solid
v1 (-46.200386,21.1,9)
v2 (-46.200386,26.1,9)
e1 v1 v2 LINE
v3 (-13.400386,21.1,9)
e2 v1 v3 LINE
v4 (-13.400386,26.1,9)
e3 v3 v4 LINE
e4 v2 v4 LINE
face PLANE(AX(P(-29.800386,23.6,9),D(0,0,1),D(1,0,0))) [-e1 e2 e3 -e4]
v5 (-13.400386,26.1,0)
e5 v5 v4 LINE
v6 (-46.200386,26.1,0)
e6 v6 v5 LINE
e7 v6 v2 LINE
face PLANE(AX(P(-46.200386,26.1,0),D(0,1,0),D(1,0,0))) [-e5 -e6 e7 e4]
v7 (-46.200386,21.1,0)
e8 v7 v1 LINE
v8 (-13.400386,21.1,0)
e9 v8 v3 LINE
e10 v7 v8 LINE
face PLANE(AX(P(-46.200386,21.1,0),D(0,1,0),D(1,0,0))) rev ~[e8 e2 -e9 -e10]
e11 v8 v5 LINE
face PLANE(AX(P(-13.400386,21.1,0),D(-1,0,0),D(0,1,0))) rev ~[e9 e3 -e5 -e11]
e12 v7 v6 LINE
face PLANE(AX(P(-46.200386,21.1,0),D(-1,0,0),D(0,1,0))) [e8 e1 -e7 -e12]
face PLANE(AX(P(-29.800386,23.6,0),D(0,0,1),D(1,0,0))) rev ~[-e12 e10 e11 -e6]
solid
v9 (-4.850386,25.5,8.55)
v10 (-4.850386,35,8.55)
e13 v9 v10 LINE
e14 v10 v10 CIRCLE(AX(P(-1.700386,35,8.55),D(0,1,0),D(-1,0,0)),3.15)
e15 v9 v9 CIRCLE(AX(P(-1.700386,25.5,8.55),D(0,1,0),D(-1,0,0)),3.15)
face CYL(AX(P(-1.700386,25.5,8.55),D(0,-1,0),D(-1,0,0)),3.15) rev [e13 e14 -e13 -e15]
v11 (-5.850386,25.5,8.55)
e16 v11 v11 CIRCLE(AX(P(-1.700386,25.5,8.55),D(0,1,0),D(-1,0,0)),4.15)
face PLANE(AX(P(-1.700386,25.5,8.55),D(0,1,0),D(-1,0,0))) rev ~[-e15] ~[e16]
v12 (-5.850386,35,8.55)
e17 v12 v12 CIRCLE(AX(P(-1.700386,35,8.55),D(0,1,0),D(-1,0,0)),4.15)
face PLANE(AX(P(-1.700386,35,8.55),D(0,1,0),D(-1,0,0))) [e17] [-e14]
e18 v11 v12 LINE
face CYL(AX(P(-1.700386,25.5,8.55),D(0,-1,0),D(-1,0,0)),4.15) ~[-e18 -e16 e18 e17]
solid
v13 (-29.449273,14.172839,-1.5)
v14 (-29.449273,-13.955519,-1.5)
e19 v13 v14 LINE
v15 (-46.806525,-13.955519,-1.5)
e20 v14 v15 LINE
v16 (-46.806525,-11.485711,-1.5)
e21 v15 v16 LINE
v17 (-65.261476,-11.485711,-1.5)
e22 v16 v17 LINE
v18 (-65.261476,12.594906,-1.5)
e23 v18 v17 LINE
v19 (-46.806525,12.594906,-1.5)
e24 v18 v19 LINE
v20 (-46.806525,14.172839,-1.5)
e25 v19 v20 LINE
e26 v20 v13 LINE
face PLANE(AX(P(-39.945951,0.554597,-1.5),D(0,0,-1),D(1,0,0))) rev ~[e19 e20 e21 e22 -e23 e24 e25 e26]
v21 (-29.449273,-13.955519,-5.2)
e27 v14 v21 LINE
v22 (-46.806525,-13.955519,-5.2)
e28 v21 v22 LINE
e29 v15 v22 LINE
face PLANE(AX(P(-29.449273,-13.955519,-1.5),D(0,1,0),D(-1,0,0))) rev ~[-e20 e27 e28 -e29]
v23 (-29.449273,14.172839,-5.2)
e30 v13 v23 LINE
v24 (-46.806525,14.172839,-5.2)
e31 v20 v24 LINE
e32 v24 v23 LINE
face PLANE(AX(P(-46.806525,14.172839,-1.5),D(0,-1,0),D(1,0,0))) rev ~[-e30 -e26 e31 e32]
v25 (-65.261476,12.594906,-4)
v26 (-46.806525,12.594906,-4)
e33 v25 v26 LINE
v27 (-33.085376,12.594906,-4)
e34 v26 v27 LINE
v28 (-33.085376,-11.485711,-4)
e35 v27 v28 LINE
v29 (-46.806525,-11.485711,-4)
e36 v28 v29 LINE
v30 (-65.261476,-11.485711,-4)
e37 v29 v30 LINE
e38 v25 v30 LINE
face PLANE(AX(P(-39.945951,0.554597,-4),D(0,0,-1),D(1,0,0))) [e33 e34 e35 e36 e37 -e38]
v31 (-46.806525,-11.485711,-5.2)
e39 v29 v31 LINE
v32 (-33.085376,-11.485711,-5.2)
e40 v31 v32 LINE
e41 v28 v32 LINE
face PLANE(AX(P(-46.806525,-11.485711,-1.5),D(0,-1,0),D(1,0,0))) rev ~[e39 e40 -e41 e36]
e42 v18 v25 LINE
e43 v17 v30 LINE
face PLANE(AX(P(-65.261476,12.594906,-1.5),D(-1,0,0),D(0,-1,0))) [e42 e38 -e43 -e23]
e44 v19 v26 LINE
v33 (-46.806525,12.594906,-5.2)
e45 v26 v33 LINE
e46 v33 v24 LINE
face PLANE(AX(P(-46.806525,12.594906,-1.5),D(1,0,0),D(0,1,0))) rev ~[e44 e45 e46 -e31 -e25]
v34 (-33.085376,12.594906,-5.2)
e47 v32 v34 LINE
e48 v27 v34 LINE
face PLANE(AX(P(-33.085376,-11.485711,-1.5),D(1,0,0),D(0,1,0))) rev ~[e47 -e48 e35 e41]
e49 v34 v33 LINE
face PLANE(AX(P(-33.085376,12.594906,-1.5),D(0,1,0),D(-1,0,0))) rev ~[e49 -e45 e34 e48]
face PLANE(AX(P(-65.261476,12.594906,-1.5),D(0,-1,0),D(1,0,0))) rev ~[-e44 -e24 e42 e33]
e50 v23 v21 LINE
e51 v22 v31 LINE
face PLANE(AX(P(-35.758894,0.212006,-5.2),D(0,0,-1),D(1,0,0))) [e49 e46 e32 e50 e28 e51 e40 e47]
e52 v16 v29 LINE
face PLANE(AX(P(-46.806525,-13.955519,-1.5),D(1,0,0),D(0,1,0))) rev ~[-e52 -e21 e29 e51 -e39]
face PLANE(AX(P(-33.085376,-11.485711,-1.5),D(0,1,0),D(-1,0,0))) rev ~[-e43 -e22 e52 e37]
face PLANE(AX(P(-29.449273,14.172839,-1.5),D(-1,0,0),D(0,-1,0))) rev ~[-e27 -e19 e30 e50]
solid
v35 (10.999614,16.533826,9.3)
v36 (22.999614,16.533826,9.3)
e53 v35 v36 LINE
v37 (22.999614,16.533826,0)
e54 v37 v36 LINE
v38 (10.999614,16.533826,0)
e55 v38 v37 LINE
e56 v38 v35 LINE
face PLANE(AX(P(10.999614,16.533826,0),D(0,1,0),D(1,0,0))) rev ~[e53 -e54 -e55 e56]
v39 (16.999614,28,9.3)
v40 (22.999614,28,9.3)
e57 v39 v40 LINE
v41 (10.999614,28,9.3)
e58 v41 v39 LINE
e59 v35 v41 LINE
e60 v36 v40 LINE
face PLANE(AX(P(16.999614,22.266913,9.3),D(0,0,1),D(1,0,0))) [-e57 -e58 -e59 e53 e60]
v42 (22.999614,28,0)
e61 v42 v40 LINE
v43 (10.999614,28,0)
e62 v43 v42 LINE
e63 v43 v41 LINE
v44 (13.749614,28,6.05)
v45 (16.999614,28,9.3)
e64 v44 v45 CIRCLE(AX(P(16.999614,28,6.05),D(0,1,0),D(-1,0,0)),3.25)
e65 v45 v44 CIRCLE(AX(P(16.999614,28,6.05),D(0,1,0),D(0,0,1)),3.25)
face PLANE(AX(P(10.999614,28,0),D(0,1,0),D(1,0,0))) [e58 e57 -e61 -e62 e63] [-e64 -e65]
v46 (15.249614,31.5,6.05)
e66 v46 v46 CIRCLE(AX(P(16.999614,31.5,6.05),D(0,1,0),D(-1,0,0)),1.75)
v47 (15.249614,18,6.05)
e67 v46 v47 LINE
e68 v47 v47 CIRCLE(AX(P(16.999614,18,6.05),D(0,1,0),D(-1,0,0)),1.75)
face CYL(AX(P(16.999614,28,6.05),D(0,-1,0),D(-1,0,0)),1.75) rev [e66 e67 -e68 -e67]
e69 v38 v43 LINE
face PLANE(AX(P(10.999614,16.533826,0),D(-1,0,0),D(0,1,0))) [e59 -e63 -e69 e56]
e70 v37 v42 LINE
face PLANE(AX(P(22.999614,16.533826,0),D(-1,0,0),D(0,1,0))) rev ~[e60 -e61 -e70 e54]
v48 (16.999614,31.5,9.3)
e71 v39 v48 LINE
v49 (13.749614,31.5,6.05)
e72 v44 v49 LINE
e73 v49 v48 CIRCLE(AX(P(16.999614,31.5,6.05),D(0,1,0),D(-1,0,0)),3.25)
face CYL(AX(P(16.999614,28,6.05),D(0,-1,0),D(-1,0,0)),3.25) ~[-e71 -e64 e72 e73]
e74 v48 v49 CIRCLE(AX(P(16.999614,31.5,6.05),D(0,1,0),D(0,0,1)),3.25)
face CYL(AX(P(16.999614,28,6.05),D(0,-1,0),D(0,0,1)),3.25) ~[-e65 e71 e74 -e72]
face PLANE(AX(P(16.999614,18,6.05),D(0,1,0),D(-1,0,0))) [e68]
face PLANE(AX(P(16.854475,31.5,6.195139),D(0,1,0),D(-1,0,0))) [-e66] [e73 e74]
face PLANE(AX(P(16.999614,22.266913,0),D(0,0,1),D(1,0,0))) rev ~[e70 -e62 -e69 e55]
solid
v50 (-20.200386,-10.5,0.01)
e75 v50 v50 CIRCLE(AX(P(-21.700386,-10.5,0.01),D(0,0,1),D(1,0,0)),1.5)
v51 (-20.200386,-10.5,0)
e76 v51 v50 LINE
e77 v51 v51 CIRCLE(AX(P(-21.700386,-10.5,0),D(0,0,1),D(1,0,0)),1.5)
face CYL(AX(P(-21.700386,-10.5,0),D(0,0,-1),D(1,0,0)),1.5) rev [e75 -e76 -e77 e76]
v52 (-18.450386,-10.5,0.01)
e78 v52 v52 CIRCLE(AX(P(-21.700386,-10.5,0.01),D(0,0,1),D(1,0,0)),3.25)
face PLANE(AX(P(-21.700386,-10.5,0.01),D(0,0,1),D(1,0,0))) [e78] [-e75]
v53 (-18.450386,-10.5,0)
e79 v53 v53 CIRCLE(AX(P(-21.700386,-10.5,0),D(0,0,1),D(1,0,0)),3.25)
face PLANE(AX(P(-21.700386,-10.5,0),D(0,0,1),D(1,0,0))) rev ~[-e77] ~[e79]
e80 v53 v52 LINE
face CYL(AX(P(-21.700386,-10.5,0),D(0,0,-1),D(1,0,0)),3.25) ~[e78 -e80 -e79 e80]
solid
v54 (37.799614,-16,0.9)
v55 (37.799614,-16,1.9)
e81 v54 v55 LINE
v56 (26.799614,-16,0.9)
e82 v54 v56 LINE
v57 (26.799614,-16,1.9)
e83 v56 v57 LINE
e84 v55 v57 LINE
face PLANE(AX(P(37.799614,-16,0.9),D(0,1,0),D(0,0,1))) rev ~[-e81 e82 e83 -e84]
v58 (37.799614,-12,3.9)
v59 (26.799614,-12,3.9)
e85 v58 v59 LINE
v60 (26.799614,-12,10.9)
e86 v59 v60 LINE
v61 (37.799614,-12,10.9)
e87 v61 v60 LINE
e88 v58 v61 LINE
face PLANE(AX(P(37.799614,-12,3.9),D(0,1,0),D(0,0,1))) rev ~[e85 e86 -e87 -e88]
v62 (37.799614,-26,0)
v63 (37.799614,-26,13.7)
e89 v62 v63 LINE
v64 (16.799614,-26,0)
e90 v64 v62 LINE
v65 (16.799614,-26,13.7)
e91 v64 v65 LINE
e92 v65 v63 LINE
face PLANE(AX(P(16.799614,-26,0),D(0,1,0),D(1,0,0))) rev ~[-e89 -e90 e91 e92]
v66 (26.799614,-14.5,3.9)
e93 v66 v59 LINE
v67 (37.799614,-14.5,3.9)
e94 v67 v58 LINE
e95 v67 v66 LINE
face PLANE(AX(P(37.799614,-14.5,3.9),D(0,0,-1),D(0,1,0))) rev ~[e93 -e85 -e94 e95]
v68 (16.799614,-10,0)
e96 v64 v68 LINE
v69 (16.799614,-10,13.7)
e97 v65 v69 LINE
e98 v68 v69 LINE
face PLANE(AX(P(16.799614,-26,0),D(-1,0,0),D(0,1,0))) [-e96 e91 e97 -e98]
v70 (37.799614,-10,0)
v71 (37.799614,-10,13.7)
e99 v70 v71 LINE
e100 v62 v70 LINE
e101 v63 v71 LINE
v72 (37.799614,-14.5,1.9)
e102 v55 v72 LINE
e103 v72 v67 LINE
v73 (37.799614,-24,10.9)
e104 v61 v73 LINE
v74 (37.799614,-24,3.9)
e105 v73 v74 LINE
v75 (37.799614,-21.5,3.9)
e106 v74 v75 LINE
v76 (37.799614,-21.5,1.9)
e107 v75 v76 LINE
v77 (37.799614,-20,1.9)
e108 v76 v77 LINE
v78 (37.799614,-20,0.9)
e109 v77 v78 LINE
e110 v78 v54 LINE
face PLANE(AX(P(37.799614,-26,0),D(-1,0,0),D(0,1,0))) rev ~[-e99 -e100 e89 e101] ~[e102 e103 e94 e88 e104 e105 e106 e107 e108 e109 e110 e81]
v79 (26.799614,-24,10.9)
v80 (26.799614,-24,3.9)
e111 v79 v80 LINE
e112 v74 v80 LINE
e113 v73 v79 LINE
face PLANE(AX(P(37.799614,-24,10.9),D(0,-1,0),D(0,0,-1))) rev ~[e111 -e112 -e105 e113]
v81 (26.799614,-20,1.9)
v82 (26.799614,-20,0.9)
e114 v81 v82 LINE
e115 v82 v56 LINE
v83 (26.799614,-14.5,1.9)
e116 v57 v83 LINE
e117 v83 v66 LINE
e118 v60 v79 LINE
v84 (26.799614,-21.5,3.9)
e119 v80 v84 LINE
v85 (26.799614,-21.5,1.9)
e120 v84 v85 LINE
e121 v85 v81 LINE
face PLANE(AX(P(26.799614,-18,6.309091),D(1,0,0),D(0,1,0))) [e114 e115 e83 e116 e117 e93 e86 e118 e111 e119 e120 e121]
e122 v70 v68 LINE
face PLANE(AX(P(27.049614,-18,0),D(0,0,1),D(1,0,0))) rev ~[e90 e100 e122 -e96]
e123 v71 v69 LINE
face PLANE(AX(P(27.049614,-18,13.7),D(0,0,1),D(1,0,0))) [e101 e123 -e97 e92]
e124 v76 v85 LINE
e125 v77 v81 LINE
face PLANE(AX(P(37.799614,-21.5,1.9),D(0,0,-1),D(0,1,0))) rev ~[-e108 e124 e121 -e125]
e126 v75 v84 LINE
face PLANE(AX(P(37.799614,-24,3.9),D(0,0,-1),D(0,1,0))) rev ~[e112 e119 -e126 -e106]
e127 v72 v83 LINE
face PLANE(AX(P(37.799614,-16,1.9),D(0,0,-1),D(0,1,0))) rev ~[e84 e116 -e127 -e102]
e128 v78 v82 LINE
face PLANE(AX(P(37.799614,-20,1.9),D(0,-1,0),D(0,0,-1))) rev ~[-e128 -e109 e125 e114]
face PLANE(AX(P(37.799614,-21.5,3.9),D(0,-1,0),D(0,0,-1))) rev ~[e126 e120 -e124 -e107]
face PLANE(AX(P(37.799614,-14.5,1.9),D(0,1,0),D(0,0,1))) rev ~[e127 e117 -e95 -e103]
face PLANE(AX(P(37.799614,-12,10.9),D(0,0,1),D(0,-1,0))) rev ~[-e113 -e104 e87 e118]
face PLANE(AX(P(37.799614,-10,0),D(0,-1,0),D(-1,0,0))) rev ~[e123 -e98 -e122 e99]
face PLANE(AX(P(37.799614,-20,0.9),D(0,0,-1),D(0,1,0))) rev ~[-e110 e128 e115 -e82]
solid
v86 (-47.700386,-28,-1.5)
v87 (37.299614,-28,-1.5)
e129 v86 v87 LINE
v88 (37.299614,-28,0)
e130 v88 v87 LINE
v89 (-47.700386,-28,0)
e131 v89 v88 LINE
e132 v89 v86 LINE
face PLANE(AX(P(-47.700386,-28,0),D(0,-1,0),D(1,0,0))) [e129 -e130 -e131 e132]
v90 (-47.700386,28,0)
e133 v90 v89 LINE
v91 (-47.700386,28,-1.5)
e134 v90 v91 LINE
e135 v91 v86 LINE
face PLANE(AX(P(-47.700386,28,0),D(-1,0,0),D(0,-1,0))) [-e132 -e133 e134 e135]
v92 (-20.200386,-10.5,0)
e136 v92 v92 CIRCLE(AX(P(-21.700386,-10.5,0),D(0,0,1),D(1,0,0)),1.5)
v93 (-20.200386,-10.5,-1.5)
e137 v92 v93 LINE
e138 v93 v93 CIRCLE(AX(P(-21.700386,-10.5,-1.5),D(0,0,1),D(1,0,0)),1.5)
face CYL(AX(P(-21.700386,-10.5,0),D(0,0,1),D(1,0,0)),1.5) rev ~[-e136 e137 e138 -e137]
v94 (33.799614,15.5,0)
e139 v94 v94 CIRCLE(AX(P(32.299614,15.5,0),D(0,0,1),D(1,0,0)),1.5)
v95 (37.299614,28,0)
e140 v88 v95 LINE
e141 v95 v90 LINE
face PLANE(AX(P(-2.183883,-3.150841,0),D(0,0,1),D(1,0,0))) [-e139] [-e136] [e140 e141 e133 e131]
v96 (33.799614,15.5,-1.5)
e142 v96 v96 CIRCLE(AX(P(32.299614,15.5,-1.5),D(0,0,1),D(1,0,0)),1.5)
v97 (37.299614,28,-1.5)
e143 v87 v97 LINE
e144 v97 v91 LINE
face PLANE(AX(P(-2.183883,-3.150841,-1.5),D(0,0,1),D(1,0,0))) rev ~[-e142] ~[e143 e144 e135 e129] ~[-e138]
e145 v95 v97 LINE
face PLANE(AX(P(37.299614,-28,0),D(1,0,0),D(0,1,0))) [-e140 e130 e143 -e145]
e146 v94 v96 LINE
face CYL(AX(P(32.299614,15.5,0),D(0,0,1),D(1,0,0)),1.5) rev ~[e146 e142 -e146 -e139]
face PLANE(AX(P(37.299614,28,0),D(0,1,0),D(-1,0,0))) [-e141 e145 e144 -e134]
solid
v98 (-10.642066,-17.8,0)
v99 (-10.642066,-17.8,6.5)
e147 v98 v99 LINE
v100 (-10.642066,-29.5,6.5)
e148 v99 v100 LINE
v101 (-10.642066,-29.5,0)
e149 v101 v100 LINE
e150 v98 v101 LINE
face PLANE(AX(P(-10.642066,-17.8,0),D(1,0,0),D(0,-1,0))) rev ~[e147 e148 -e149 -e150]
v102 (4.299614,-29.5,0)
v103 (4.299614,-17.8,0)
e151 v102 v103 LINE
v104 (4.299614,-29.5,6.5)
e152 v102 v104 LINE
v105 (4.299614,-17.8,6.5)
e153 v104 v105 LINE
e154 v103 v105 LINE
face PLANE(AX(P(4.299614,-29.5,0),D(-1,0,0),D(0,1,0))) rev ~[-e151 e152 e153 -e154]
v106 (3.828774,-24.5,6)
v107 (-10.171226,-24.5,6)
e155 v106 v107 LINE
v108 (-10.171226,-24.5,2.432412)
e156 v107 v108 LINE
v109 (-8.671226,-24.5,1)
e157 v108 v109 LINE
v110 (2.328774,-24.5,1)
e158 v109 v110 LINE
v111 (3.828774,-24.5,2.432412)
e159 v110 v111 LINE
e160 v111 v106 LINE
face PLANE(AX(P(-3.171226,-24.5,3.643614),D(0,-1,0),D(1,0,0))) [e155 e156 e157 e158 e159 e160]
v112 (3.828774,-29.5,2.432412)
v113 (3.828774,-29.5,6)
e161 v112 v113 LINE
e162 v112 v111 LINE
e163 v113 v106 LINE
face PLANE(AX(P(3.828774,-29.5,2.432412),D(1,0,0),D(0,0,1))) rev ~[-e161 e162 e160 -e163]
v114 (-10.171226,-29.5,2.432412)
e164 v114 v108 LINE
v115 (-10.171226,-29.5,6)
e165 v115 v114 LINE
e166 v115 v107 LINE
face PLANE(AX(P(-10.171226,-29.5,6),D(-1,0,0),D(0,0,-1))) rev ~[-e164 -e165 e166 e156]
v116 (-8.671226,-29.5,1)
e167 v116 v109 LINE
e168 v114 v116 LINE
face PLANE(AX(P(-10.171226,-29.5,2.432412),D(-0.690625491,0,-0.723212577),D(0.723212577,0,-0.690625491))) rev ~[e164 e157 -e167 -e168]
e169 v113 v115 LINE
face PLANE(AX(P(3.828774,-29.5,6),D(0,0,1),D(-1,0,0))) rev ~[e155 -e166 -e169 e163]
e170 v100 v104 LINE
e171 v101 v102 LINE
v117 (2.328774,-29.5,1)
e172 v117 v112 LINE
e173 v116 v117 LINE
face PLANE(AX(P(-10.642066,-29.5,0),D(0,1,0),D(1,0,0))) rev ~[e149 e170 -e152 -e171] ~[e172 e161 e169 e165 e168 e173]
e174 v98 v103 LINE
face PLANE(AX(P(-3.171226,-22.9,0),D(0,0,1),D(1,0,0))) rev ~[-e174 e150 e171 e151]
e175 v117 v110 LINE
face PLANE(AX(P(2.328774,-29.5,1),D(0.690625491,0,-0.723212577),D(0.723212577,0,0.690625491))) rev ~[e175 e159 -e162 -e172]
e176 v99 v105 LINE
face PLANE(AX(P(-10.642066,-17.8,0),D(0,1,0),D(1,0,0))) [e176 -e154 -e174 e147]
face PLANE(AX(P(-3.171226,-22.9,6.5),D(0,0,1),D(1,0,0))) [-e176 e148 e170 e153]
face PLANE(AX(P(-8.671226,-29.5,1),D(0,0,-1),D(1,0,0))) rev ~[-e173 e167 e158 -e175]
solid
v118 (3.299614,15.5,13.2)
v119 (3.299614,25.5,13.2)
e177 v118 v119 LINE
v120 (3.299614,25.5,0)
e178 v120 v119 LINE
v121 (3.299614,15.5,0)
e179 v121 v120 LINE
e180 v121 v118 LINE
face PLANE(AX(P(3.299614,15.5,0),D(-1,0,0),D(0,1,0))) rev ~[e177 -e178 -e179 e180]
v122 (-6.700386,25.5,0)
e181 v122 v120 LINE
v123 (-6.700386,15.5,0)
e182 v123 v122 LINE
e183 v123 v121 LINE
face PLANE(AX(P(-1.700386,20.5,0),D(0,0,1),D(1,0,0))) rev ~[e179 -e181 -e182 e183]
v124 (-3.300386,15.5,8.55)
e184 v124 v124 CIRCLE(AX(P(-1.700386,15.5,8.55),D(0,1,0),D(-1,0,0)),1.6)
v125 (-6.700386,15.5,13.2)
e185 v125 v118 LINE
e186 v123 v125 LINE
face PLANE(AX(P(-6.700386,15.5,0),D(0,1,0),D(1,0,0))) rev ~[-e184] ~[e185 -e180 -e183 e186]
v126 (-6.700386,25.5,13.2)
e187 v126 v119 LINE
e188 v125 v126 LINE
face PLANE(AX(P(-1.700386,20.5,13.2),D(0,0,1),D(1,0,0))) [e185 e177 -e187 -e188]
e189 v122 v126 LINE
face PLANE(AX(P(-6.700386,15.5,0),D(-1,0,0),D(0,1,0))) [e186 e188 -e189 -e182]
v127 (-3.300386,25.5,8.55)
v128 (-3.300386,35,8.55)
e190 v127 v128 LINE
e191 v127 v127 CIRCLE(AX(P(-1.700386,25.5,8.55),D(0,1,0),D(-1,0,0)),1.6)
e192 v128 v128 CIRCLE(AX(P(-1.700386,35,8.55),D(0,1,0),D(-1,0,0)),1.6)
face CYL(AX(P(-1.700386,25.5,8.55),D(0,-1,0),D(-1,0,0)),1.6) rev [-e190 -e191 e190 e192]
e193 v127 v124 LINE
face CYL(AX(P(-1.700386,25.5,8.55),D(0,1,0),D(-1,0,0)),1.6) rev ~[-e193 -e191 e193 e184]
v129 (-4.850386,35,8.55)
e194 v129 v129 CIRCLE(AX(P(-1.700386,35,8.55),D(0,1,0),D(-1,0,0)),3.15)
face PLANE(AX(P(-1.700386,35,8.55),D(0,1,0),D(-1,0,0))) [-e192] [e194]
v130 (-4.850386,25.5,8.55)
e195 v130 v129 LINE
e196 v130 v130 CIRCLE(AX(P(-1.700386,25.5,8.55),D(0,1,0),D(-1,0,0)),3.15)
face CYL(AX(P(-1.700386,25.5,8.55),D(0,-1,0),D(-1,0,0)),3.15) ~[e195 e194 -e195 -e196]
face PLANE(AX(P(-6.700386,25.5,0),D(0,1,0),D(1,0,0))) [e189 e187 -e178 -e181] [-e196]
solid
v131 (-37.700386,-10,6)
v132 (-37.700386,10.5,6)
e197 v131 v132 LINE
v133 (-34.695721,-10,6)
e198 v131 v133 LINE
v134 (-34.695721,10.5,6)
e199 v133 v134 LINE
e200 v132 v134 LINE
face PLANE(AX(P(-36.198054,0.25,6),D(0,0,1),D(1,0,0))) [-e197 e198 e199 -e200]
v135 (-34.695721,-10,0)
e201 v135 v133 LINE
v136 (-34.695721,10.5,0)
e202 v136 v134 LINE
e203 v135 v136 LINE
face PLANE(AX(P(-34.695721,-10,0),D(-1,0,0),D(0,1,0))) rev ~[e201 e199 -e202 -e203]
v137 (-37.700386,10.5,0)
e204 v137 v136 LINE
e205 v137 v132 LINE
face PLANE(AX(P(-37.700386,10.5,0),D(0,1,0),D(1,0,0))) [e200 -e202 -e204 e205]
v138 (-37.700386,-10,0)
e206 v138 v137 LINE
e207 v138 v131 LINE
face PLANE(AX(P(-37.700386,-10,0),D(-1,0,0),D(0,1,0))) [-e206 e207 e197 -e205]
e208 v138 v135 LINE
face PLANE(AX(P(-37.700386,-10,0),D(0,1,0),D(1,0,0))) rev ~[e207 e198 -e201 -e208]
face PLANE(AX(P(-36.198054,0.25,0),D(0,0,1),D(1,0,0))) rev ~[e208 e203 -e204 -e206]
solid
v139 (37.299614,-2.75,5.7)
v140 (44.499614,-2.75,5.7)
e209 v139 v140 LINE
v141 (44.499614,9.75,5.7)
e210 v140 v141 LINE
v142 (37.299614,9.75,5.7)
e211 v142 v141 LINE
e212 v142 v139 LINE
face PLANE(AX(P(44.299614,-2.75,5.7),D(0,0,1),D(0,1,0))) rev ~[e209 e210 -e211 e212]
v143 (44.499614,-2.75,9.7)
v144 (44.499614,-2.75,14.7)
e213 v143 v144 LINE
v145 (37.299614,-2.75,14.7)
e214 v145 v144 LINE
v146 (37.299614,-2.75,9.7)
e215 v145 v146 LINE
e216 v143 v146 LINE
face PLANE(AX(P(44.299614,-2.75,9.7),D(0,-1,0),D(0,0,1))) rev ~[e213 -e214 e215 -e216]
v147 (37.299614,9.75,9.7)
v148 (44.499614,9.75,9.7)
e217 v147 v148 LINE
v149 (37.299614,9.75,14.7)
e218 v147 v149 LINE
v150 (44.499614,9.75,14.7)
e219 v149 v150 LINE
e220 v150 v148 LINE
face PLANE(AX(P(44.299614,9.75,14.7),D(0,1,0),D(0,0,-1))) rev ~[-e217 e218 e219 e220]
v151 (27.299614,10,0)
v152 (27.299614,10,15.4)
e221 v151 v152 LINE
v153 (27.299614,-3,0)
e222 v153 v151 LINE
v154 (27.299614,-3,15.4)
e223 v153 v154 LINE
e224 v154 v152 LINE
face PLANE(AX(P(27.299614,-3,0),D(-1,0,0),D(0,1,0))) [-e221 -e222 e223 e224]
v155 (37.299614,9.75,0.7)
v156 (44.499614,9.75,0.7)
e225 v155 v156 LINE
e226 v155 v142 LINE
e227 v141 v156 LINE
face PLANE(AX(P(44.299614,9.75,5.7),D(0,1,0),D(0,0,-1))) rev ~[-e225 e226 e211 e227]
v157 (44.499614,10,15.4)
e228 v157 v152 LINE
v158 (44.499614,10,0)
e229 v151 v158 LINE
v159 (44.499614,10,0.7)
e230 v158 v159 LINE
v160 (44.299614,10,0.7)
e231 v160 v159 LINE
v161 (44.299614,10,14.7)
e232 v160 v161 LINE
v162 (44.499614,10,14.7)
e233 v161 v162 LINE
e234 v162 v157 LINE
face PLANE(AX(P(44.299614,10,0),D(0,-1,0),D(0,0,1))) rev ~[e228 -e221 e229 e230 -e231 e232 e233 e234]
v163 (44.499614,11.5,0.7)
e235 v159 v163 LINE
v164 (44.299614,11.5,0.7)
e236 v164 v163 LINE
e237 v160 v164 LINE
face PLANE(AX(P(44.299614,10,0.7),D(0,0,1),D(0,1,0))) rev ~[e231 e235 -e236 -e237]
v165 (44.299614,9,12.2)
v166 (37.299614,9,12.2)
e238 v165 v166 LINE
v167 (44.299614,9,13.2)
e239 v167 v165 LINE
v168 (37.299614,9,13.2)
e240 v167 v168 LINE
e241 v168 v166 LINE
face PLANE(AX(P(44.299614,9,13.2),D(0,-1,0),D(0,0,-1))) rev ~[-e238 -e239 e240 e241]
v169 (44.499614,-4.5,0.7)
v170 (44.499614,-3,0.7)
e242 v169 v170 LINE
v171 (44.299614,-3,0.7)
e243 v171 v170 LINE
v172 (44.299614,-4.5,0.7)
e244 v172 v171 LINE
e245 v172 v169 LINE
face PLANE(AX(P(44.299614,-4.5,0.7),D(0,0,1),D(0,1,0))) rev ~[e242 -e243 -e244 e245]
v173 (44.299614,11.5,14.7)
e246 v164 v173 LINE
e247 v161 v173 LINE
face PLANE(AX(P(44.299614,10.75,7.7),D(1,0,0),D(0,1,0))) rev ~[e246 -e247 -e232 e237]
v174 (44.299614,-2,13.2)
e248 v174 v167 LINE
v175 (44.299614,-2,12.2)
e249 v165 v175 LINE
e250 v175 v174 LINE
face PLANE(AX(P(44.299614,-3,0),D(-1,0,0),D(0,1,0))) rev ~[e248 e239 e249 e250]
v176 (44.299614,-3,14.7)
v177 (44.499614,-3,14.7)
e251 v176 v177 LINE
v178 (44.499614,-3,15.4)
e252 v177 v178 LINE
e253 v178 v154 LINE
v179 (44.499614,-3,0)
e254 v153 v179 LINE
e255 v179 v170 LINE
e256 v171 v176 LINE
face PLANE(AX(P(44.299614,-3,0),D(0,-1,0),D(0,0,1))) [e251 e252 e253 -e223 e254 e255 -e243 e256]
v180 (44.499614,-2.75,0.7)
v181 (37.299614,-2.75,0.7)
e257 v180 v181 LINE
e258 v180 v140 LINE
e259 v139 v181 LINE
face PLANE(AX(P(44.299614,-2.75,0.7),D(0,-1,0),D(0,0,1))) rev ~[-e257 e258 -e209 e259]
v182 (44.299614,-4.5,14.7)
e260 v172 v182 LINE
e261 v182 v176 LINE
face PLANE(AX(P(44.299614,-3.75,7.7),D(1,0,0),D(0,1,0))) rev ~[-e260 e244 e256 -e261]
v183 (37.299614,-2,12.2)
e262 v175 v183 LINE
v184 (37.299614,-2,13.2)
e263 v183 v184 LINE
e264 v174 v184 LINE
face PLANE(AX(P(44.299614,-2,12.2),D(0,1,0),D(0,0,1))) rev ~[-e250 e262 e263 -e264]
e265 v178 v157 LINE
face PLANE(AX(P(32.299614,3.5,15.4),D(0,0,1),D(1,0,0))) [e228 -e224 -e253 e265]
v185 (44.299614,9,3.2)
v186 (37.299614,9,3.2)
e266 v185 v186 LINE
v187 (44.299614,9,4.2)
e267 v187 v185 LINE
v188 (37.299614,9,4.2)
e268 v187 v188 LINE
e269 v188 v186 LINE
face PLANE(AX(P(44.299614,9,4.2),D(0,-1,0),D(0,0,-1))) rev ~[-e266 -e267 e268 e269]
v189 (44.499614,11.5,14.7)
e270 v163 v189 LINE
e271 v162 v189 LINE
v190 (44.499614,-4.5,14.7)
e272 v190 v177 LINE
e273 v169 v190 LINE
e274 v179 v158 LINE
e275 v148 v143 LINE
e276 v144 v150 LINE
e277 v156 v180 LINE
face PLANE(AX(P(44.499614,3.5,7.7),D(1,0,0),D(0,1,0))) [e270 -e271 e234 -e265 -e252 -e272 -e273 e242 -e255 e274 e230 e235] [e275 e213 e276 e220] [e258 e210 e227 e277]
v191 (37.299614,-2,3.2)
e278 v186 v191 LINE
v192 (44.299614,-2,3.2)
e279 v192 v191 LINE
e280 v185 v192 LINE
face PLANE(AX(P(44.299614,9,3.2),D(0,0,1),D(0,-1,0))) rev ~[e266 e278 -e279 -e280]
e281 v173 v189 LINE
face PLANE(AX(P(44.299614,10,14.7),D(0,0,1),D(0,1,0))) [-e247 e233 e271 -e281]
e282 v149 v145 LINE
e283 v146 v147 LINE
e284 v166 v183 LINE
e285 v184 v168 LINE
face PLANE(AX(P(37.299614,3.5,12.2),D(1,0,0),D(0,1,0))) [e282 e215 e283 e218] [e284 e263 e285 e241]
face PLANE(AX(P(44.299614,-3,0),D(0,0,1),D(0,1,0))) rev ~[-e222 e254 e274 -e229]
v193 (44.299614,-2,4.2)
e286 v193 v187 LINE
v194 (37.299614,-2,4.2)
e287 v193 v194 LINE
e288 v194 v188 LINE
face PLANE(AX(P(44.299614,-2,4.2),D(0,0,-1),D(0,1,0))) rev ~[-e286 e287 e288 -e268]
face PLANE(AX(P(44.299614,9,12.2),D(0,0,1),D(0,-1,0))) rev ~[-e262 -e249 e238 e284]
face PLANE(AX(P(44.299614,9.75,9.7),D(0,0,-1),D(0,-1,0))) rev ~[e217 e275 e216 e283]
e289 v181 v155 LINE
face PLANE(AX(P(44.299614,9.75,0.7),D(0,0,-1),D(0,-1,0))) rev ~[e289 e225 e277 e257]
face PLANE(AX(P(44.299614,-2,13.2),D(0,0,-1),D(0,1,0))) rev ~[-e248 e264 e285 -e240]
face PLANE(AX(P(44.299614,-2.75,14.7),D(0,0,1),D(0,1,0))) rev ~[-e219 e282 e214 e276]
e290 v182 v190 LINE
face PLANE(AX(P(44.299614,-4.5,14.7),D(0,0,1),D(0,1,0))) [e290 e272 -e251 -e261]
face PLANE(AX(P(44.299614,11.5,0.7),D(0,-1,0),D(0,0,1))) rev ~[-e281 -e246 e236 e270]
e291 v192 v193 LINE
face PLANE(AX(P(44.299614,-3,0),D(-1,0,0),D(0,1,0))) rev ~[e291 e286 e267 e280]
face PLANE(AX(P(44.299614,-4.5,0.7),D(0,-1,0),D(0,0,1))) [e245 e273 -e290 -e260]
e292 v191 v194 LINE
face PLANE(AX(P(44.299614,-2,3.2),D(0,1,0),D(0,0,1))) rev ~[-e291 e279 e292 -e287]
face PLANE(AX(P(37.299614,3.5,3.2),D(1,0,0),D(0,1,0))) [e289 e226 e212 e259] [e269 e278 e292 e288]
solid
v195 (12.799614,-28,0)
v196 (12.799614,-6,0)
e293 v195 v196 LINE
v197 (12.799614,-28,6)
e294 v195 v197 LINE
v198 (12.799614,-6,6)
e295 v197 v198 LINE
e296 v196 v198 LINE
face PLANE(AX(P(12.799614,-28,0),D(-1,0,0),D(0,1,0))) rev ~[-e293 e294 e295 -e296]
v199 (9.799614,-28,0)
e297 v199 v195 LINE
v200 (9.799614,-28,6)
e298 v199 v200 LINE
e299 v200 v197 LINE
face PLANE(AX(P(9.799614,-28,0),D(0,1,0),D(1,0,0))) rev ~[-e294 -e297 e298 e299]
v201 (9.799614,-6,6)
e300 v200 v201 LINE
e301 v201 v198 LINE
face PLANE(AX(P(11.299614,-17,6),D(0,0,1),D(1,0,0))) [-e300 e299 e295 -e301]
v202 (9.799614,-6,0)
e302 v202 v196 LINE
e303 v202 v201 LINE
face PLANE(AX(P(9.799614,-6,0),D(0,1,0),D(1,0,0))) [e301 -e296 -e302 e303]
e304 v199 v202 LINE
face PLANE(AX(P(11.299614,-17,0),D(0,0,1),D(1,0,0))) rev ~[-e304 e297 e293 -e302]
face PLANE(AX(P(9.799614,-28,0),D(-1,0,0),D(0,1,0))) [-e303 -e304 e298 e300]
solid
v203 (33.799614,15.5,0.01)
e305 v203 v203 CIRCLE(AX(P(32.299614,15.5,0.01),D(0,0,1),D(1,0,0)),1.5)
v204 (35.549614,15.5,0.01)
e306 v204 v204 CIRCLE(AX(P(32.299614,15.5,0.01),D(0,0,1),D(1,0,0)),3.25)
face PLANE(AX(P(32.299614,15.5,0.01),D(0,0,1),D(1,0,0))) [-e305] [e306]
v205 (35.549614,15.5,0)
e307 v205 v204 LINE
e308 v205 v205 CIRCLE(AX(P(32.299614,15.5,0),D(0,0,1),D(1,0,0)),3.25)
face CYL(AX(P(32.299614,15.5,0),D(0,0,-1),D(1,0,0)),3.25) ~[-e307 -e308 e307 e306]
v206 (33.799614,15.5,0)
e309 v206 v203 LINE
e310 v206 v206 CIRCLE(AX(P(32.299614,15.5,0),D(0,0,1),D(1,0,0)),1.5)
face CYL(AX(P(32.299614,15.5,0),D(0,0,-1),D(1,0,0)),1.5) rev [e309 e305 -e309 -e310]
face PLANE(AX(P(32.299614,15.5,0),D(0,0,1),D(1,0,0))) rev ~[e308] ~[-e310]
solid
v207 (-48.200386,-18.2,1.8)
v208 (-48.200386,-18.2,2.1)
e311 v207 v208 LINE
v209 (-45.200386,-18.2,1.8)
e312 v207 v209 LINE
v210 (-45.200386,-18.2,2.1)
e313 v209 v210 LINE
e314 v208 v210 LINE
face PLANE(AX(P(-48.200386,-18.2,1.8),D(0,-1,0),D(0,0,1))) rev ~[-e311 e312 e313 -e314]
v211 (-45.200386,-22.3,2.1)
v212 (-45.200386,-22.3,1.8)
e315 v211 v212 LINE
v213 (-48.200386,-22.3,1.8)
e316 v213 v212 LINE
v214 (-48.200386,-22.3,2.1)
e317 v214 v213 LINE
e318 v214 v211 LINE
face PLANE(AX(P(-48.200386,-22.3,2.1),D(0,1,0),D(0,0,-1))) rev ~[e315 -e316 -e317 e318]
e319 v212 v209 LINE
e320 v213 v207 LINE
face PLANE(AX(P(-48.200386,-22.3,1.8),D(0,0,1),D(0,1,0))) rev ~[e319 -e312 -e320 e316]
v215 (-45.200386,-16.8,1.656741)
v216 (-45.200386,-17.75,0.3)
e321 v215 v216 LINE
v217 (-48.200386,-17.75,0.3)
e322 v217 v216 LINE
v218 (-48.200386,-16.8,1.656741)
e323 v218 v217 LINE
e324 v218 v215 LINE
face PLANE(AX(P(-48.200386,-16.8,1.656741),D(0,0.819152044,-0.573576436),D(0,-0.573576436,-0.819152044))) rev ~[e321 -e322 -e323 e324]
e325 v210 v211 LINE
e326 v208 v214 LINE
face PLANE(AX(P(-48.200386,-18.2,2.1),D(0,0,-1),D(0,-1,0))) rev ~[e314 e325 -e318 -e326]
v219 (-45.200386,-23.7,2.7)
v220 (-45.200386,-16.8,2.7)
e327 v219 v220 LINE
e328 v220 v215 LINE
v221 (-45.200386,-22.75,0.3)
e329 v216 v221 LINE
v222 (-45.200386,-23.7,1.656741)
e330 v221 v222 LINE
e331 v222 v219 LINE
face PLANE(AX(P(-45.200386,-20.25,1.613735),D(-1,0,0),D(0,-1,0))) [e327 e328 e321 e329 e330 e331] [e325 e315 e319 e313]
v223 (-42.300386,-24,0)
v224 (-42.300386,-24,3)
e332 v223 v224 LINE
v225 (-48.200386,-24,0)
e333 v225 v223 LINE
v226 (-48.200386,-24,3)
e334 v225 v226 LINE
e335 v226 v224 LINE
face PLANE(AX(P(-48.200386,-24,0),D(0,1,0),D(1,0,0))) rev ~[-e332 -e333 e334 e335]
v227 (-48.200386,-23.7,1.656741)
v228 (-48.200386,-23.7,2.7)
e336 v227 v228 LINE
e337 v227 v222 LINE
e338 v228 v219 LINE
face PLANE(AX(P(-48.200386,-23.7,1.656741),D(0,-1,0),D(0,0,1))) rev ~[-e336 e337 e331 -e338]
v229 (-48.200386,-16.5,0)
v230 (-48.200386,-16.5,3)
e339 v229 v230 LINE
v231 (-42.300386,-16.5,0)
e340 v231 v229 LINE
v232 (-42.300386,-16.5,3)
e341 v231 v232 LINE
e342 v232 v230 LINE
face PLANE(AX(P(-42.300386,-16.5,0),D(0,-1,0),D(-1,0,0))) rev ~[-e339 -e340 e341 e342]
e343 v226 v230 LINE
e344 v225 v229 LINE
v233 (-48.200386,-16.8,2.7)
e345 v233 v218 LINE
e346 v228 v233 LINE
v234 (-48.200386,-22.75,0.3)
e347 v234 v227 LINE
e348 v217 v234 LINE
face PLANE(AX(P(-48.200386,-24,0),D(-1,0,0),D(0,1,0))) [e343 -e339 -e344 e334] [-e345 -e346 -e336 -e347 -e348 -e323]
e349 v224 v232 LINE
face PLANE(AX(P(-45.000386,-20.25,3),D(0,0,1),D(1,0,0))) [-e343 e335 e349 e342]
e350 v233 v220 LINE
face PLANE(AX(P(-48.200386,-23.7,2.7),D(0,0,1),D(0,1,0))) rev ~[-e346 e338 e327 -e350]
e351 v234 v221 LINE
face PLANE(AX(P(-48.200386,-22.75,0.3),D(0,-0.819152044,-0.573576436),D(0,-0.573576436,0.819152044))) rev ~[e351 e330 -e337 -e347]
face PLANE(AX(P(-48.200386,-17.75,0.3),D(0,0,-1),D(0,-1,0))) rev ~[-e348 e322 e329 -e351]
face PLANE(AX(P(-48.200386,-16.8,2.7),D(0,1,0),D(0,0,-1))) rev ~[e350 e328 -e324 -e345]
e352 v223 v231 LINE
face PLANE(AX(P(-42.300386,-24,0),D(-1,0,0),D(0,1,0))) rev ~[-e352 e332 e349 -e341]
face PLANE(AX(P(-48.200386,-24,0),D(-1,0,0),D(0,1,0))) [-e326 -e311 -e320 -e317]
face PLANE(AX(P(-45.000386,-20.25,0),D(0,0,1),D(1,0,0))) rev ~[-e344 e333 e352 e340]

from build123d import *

# Parameters (mm, degrees)
F0_R      = 3.25
F0_W      = 32.8
F0_H      = 5
F0_W_2    = 10
F0_H_2    = 10
F0_H_3    = 13
F0_R_2    = 1.5
F0_W_3    = 20.5
F0_H_4    = 16
F0_W_4    = 13.5
F0_H_5    = 24
F0_W_5    = 3.0046645552
F0_H_6    = 20.5
F0_W_6    = 1
F0_W_7    = 5.4
F0_H_7    = 7.5
F0_W_8    = 12
F0_H_8    = 11.4661744535
F0_W_9    = 14.9416802451
F0_H_9    = 10.2
F0_W_10   = 3
F0_H_10   = 22
F1_DEPTH  = 1.5
F0_W_11   = 0.5
F2_DEPTH  = 13.7
F0_W_12   = 7
F3_DEPTH  = 15.4
F4_DEPTH  = 9.3
F5_DEPTH  = 13.2
F6_DEPTH  = 9
F7_DEPTH  = 6
F0_H_11   = 1.5
F8_DEPTH  = 6.5
F9_DEPTH  = 0.01
F10_DEPTH = 3
F11_DEPTH = 6
F13_DEPTH = 3.7
F12_W     = 13.7211494148
F12_H     = 24.080616422
F12_W_2   = 0.8938605189
F12_W_3   = 17.5610897839
F14_DEPTH = 2.5
F15_R     = 1.75
F16_DEPTH = 3.5
F17_DEPTH = 10
F18_R     = 1.6
F19_DEPTH = 55.001
F18_R_2   = 3.15
F20_DEPTH = 9.5
F18_R_3   = 4.15
F21_DEPTH = 9.5
F23_DEPTH = 5
F25_DEPTH = 11
F27_DEPTH = 7
F29_DEPTH = 3
F30_W     = 1.5
F30_H     = 14
F26_W     = 13
F26_H     = 15.4
F31_DEPTH = 0.2


with BuildPart() as f1:
    # F0 (on Top) → F1 (new body)
    with BuildSketch(Plane.XY):
        Polygon((10.999614042, 28), (-47.700385958, 28), (-47.700385958, 12.6100301519), (-46.700385958, 12.6100301519), (-46.700385958, 14.1100301519), (-29.700385958, 14.1100301519), (-29.700385958, -13.8899698481), (-46.700385958, -13.8899698481), (-46.700385958, -11.3899698481), (-47.700385958, -11.3899698481), (-47.700385958, -16.5), (-42.300385958, -16.5), (-42.300385958, -24), (-47.700385958, -24), (-47.700385958, -28), (-10.6420662031, -28), (-10.6420662031, -17.8), (4.299614042, -17.8), (4.299614042, -28), (9.799614042, -28), (9.799614042, -6), (12.799614042, -6), (12.799614042, -28), (37.299614042, -28), (37.299614042, -26), (16.799614042, -26), (16.799614042, -10), (37.299614042, -10), (37.299614042, -3), (27.299614042, -3), (27.299614042, 10), (37.299614042, 10), (37.299614042, 28), (22.999614042, 28), (22.999614042, 16.5338255465), (10.999614042, 16.5338255465), align=None)
        with Locations((-21.700385958, -10.5)):
            Circle(F0_R, mode=Mode.SUBTRACT)
        with Locations((-29.800385958, 23.6)):
            Rectangle(F0_W, F0_H, mode=Mode.SUBTRACT)
        with Locations((-1.700385958, 20.5)):
            Rectangle(F0_W_2, F0_H_2, mode=Mode.SUBTRACT)
        with Locations((32.299614042, 15.5)):
            Circle(F0_R, mode=Mode.SUBTRACT)
        with Locations((32.299614042, 3.5)):
            Rectangle(F0_W_2, F0_H_3)
        with Locations((32.299614042, 15.5)):
            Circle(F0_R)
        with Locations((32.299614042, 15.5)):
            Circle(F0_R_2, mode=Mode.SUBTRACT)
        with Locations((-21.700385958, -10.5)):
            Circle(F0_R)
        with Locations((-21.700385958, -10.5)):
            Circle(F0_R_2, mode=Mode.SUBTRACT)
        with Locations((27.049614042, -18)):
            Rectangle(F0_W_3, F0_H_4)
        Polygon((-46.700385958, 14.1100301519), (-46.700385958, 12.6100301519), (-33.200385958, 12.6100301519), (-33.200385958, -11.3899698481), (-46.700385958, -11.3899698481), (-46.700385958, -13.8899698481), (-29.700385958, -13.8899698481), (-29.700385958, 14.1100301519), align=None)
        with Locations((-39.950385958, 0.6100301519)):
            Rectangle(F0_W_4, F0_H_5)
        with Locations((-36.1980536804, 0.25)):
            Rectangle(F0_W_5, F0_H_6, mode=Mode.SUBTRACT)
        with Locations((-47.200385958, 0.6100301519)):
            Rectangle(F0_W_6, F0_H_5)
        with Locations((-45.000385958, -20.25)):
            Rectangle(F0_W_7, F0_H_7)
        with Locations((-29.800385958, 23.6)):
            Rectangle(F0_W, F0_H)
        with Locations((-1.700385958, 20.5)):
            Rectangle(F0_W_2, F0_H_2)
        with Locations((16.999614042, 22.2669127733)):
            Rectangle(F0_W_8, F0_H_8)
        with Locations((-3.1712260805, -22.9)):
            Rectangle(F0_W_9, F0_H_9)
        with Locations((11.299614042, -17)):
            Rectangle(F0_W_10, F0_H_10)
        with Locations((-36.1980536804, 0.25)):
            Rectangle(F0_W_5, F0_H_6)
    extrude(amount=-F1_DEPTH)


with BuildPart() as f2:
    # F0 (on Top) → F2 (new body)
    with BuildSketch(Plane.XY):
        with Locations((27.049614042, -18)):
            Rectangle(F0_W_3, F0_H_4)
        with Locations((37.549614042, -18)):
            Rectangle(F0_W_11, F0_H_4)
    extrude(amount=F2_DEPTH)

    # F24 (on face) → F25 (cut)
    with BuildSketch(Plane.YZ.offset(37.799614042)):
        Polygon((-12, 10.9), (-18, 10.9), (-24, 10.9), (-24, 3.9), (-21.5, 3.9), (-21.5, 1.9), (-20, 1.9), (-20, 0.9), (-18, 0.9), (-16, 0.9), (-16, 1.9), (-14.5, 1.9), (-14.5, 3.9), (-12, 3.9), align=None)
    extrude(amount=-F25_DEPTH, mode=Mode.SUBTRACT)


with BuildPart() as f3:
    # F0 (on Top) → F3 (new body)
    with BuildSketch(Plane.XY):
        with Locations((32.299614042, 3.5)):
            Rectangle(F0_W_2, F0_H_3)
        with Locations((40.799614042, 3.5)):
            Rectangle(F0_W_12, F0_H_3)
    extrude(amount=F3_DEPTH)

    # F26 (on face) → F27 (cut)
    with BuildSketch(Plane.YZ.offset(44.299614042)):
        Polygon((9.75, 14.7), (3.5, 14.7), (-2.75, 14.7), (-2.75, 9.7), (3.5, 9.7), (9.75, 9.7), align=None)
        Polygon((-2, 13.2), (3.5, 13.2), (9, 13.2), (9, 12.2), (3.5, 12.2), (-2, 12.2), align=None, mode=Mode.SUBTRACT)
        Polygon((9.75, 5.7), (3.5, 5.7), (-2.75, 5.7), (-2.75, 0.7), (3.5, 0.7), (9.75, 0.7), align=None)
        Polygon((-2, 4.2), (3.5, 4.2), (9, 4.2), (9, 3.2), (3.5, 3.2), (-2, 3.2), align=None, mode=Mode.SUBTRACT)
    extrude(amount=-F27_DEPTH, mode=Mode.SUBTRACT)

    # F30 (on face) + F26 (on face) → F31 (join)
    with BuildSketch(Plane.YZ.offset(44.299614042)):
        with Locations((-3.75, 7.7)):
            Rectangle(F30_W, F30_H)
        with Locations((10.75, 7.7)):
            Rectangle(F30_W, F30_H)
    with BuildSketch(Plane.YZ.offset(44.299614042)):
        with Locations((3.5, 7.7)):
            Rectangle(F26_W, F26_H)
        Polygon((-2.75, 5.7), (3.5, 5.7), (9.75, 5.7), (9.75, 0.7), (3.5, 0.7), (-2.75, 0.7), align=None, mode=Mode.SUBTRACT)
        Polygon((-2.75, 14.7), (3.5, 14.7), (9.75, 14.7), (9.75, 9.7), (3.5, 9.7), (-2.75, 9.7), align=None, mode=Mode.SUBTRACT)
    extrude(amount=F31_DEPTH)


with BuildPart() as f4:
    # F0 (on Top) → F4 (new body)
    with BuildSketch(Plane.XY):
        with Locations((16.999614042, 22.2669127733)):
            Rectangle(F0_W_8, F0_H_8)
    extrude(amount=F4_DEPTH)

    # F15 (on face) → F16 (join)
    with BuildSketch(Plane(origin=(0, 28, 0), x_dir=(-1, 0, 0), z_dir=(0, 1, 0))):
        with BuildLine():
            ThreePointArc((-16.999614042, 9.3), (-19.2977110809, 3.7519029611), (-13.749614042, 6.05))
            ThreePointArc((-13.749614042, 6.05), (-14.7015170032, 8.3480970389), (-16.999614042, 9.3))
        make_face()
        with Locations((-16.999614042, 6.05)):
            Circle(F15_R, mode=Mode.SUBTRACT)
    extrude(amount=F16_DEPTH)

    # F15 (on face) → F17 (cut)
    with BuildSketch(Plane(origin=(0, 28, 0), x_dir=(-1, 0, 0), z_dir=(0, 1, 0))):
        with Locations((-16.999614042, 6.05)):
            Circle(F15_R)
    extrude(amount=-F17_DEPTH, mode=Mode.SUBTRACT)


with BuildPart() as f5:
    # F0 (on Top) → F5 (new body)
    with BuildSketch(Plane.XY):
        with Locations((-1.700385958, 20.5)):
            Rectangle(F0_W_2, F0_H_2)
    extrude(amount=F5_DEPTH)

    # F18 (on face) → F19 (cut, through all)
    with BuildSketch(Plane(origin=(0, 25.5, 0), x_dir=(-1, 0, 0), z_dir=(0, 1, 0))):
        with Locations((1.700385958, 8.55)):
            Circle(F18_R)
    extrude(amount=-F19_DEPTH, mode=Mode.SUBTRACT)

    # F18 (on face) → F20 (join)
    with BuildSketch(Plane(origin=(0, 25.5, 0), x_dir=(-1, 0, 0), z_dir=(0, 1, 0))):
        with Locations((1.700385958, 8.55)):
            Circle(F18_R_2)
        with Locations((1.700385958, 8.55)):
            Circle(F18_R, mode=Mode.SUBTRACT)
    extrude(amount=F20_DEPTH)


with BuildPart() as f6:
    # F0 (on Top) → F6 (new body)
    with BuildSketch(Plane.XY):
        with Locations((-29.800385958, 23.6)):
            Rectangle(F0_W, F0_H)
    extrude(amount=F6_DEPTH)


with BuildPart() as f7:
    # F0 (on Top) → F7 (new body)
    with BuildSketch(Plane.XY):
        with Locations((11.299614042, -17)):
            Rectangle(F0_W_10, F0_H_10)
    extrude(amount=F7_DEPTH)


with BuildPart() as f8:
    # F0 (on Top) → F8 (new body)
    with BuildSketch(Plane.XY):
        with Locations((-3.1712260805, -22.9)):
            Rectangle(F0_W_9, F0_H_9)
        with Locations((-3.1712260805, -28.75)):
            Rectangle(F0_W_9, F0_H_11)
    extrude(amount=F8_DEPTH)

    # F22 (on face) → F23 (cut)
    with BuildSketch(Plane.XZ.offset(29.5)):
        Polygon((3.8287739195, 2.4324118094), (3.8287739195, 6), (-3.1712260805, 6), (-10.1712260805, 6), (-10.1712260805, 2.4324118094), (-8.6712260805, 1), (-3.1712260805, 1), (2.3287739195, 1), align=None)
    extrude(amount=-F23_DEPTH, mode=Mode.SUBTRACT)


with BuildPart() as f9:
    # F0 (on Top) → F9 (new body)
    with BuildSketch(Plane.XY):
        with Locations((32.299614042, 15.5)):
            Circle(F0_R)
        with Locations((32.299614042, 15.5)):
            Circle(F0_R_2, mode=Mode.SUBTRACT)
    extrude(amount=F9_DEPTH)


with BuildPart() as f9b:
    # F0 (on Top) → F9, piece 2 (new body)
    with BuildSketch(Plane.XY):
        with Locations((-21.700385958, -10.5)):
            Circle(F0_R)
        with Locations((-21.700385958, -10.5)):
            Circle(F0_R_2, mode=Mode.SUBTRACT)
    extrude(amount=F9_DEPTH)


with BuildPart() as f10:
    # F0 (on Top) → F10 (new body)
    with BuildSketch(Plane.XY):
        with Locations((-45.000385958, -20.25)):
            Rectangle(F0_W_7, F0_H_7)
        with Locations((-47.950385958, -20.25)):
            Rectangle(F0_W_11, F0_H_7)
    extrude(amount=F10_DEPTH)

    # F28 (on face) → F29 (cut)
    with BuildSketch(Plane(origin=(-48.200385958, 0, 0), x_dir=(0, -1, 0), z_dir=(-1, 0, 0))):
        Polygon((23.7, 2.7), (20.25, 2.7), (16.8, 2.7), (16.8, 1.6567406064), (17.75, 0.3), (20.25, 0.3), (22.75, 0.3), (23.7, 1.6567406064), align=None)
        Polygon((18.2, 2.1), (20.25, 2.1), (22.3, 2.1), (22.3, 1.8), (20.25, 1.8), (18.2, 1.8), align=None, mode=Mode.SUBTRACT)
    extrude(amount=-F29_DEPTH, mode=Mode.SUBTRACT)


with BuildPart() as f11:
    # F0 (on Top) → F11 (new body)
    with BuildSketch(Plane.XY):
        with Locations((-36.1980536804, 0.25)):
            Rectangle(F0_W_5, F0_H_6)
    extrude(amount=F11_DEPTH)


with BuildPart() as f13:
    # F12 (on face) → F13 (new body)
    with BuildSketch(Plane(origin=(0, 0, -1.5), x_dir=(1, 0, 0), z_dir=(0, 0, -1))):
        Polygon((-46.806525439, 13.9555186033), (-46.806525439, 11.4857107401), (-33.0853760242, 11.4857107401), (-33.0853760242, -12.5949056819), (-46.806525439, -12.5949056819), (-46.806525439, -14.1728390008), (-29.4492729008, -14.1728390008), (-29.4492729008, 13.9555186033), align=None)
    extrude(amount=F13_DEPTH)

    # F12 (on face) → F14 (join)
    with BuildSketch(Plane(origin=(0, 0, -1.5), x_dir=(1, 0, 0), z_dir=(0, 0, -1))):
        with Locations((-39.9459507316, -0.5545974709)):
            Rectangle(F12_W, F12_H)
        with Locations((-47.2534556985, -0.5545974709)):
            Rectangle(F12_W_2, F12_H)
        with Locations((-56.4809308499, -0.5545974709)):
            Rectangle(F12_W_3, F12_H)
    extrude(amount=F14_DEPTH)


with BuildPart() as f21:
    # F18 (on face) → F21 (new body)
    with BuildSketch(Plane(origin=(0, 25.5, 0), x_dir=(-1, 0, 0), z_dir=(0, 1, 0))):
        with Locations((1.700385958, 8.55)):
            Circle(F18_R_3)
        with Locations((1.700385958, 8.55)):
            Circle(F18_R_2, mode=Mode.SUBTRACT)
    extrude(amount=F21_DEPTH)


solid = Compound([f1.part, f2.part, f3.part, f4.part, f5.part, f6.part, f7.part, f8.part, f9.part, f9b.part, f10.part, f11.part, f13.part, f21.part])
